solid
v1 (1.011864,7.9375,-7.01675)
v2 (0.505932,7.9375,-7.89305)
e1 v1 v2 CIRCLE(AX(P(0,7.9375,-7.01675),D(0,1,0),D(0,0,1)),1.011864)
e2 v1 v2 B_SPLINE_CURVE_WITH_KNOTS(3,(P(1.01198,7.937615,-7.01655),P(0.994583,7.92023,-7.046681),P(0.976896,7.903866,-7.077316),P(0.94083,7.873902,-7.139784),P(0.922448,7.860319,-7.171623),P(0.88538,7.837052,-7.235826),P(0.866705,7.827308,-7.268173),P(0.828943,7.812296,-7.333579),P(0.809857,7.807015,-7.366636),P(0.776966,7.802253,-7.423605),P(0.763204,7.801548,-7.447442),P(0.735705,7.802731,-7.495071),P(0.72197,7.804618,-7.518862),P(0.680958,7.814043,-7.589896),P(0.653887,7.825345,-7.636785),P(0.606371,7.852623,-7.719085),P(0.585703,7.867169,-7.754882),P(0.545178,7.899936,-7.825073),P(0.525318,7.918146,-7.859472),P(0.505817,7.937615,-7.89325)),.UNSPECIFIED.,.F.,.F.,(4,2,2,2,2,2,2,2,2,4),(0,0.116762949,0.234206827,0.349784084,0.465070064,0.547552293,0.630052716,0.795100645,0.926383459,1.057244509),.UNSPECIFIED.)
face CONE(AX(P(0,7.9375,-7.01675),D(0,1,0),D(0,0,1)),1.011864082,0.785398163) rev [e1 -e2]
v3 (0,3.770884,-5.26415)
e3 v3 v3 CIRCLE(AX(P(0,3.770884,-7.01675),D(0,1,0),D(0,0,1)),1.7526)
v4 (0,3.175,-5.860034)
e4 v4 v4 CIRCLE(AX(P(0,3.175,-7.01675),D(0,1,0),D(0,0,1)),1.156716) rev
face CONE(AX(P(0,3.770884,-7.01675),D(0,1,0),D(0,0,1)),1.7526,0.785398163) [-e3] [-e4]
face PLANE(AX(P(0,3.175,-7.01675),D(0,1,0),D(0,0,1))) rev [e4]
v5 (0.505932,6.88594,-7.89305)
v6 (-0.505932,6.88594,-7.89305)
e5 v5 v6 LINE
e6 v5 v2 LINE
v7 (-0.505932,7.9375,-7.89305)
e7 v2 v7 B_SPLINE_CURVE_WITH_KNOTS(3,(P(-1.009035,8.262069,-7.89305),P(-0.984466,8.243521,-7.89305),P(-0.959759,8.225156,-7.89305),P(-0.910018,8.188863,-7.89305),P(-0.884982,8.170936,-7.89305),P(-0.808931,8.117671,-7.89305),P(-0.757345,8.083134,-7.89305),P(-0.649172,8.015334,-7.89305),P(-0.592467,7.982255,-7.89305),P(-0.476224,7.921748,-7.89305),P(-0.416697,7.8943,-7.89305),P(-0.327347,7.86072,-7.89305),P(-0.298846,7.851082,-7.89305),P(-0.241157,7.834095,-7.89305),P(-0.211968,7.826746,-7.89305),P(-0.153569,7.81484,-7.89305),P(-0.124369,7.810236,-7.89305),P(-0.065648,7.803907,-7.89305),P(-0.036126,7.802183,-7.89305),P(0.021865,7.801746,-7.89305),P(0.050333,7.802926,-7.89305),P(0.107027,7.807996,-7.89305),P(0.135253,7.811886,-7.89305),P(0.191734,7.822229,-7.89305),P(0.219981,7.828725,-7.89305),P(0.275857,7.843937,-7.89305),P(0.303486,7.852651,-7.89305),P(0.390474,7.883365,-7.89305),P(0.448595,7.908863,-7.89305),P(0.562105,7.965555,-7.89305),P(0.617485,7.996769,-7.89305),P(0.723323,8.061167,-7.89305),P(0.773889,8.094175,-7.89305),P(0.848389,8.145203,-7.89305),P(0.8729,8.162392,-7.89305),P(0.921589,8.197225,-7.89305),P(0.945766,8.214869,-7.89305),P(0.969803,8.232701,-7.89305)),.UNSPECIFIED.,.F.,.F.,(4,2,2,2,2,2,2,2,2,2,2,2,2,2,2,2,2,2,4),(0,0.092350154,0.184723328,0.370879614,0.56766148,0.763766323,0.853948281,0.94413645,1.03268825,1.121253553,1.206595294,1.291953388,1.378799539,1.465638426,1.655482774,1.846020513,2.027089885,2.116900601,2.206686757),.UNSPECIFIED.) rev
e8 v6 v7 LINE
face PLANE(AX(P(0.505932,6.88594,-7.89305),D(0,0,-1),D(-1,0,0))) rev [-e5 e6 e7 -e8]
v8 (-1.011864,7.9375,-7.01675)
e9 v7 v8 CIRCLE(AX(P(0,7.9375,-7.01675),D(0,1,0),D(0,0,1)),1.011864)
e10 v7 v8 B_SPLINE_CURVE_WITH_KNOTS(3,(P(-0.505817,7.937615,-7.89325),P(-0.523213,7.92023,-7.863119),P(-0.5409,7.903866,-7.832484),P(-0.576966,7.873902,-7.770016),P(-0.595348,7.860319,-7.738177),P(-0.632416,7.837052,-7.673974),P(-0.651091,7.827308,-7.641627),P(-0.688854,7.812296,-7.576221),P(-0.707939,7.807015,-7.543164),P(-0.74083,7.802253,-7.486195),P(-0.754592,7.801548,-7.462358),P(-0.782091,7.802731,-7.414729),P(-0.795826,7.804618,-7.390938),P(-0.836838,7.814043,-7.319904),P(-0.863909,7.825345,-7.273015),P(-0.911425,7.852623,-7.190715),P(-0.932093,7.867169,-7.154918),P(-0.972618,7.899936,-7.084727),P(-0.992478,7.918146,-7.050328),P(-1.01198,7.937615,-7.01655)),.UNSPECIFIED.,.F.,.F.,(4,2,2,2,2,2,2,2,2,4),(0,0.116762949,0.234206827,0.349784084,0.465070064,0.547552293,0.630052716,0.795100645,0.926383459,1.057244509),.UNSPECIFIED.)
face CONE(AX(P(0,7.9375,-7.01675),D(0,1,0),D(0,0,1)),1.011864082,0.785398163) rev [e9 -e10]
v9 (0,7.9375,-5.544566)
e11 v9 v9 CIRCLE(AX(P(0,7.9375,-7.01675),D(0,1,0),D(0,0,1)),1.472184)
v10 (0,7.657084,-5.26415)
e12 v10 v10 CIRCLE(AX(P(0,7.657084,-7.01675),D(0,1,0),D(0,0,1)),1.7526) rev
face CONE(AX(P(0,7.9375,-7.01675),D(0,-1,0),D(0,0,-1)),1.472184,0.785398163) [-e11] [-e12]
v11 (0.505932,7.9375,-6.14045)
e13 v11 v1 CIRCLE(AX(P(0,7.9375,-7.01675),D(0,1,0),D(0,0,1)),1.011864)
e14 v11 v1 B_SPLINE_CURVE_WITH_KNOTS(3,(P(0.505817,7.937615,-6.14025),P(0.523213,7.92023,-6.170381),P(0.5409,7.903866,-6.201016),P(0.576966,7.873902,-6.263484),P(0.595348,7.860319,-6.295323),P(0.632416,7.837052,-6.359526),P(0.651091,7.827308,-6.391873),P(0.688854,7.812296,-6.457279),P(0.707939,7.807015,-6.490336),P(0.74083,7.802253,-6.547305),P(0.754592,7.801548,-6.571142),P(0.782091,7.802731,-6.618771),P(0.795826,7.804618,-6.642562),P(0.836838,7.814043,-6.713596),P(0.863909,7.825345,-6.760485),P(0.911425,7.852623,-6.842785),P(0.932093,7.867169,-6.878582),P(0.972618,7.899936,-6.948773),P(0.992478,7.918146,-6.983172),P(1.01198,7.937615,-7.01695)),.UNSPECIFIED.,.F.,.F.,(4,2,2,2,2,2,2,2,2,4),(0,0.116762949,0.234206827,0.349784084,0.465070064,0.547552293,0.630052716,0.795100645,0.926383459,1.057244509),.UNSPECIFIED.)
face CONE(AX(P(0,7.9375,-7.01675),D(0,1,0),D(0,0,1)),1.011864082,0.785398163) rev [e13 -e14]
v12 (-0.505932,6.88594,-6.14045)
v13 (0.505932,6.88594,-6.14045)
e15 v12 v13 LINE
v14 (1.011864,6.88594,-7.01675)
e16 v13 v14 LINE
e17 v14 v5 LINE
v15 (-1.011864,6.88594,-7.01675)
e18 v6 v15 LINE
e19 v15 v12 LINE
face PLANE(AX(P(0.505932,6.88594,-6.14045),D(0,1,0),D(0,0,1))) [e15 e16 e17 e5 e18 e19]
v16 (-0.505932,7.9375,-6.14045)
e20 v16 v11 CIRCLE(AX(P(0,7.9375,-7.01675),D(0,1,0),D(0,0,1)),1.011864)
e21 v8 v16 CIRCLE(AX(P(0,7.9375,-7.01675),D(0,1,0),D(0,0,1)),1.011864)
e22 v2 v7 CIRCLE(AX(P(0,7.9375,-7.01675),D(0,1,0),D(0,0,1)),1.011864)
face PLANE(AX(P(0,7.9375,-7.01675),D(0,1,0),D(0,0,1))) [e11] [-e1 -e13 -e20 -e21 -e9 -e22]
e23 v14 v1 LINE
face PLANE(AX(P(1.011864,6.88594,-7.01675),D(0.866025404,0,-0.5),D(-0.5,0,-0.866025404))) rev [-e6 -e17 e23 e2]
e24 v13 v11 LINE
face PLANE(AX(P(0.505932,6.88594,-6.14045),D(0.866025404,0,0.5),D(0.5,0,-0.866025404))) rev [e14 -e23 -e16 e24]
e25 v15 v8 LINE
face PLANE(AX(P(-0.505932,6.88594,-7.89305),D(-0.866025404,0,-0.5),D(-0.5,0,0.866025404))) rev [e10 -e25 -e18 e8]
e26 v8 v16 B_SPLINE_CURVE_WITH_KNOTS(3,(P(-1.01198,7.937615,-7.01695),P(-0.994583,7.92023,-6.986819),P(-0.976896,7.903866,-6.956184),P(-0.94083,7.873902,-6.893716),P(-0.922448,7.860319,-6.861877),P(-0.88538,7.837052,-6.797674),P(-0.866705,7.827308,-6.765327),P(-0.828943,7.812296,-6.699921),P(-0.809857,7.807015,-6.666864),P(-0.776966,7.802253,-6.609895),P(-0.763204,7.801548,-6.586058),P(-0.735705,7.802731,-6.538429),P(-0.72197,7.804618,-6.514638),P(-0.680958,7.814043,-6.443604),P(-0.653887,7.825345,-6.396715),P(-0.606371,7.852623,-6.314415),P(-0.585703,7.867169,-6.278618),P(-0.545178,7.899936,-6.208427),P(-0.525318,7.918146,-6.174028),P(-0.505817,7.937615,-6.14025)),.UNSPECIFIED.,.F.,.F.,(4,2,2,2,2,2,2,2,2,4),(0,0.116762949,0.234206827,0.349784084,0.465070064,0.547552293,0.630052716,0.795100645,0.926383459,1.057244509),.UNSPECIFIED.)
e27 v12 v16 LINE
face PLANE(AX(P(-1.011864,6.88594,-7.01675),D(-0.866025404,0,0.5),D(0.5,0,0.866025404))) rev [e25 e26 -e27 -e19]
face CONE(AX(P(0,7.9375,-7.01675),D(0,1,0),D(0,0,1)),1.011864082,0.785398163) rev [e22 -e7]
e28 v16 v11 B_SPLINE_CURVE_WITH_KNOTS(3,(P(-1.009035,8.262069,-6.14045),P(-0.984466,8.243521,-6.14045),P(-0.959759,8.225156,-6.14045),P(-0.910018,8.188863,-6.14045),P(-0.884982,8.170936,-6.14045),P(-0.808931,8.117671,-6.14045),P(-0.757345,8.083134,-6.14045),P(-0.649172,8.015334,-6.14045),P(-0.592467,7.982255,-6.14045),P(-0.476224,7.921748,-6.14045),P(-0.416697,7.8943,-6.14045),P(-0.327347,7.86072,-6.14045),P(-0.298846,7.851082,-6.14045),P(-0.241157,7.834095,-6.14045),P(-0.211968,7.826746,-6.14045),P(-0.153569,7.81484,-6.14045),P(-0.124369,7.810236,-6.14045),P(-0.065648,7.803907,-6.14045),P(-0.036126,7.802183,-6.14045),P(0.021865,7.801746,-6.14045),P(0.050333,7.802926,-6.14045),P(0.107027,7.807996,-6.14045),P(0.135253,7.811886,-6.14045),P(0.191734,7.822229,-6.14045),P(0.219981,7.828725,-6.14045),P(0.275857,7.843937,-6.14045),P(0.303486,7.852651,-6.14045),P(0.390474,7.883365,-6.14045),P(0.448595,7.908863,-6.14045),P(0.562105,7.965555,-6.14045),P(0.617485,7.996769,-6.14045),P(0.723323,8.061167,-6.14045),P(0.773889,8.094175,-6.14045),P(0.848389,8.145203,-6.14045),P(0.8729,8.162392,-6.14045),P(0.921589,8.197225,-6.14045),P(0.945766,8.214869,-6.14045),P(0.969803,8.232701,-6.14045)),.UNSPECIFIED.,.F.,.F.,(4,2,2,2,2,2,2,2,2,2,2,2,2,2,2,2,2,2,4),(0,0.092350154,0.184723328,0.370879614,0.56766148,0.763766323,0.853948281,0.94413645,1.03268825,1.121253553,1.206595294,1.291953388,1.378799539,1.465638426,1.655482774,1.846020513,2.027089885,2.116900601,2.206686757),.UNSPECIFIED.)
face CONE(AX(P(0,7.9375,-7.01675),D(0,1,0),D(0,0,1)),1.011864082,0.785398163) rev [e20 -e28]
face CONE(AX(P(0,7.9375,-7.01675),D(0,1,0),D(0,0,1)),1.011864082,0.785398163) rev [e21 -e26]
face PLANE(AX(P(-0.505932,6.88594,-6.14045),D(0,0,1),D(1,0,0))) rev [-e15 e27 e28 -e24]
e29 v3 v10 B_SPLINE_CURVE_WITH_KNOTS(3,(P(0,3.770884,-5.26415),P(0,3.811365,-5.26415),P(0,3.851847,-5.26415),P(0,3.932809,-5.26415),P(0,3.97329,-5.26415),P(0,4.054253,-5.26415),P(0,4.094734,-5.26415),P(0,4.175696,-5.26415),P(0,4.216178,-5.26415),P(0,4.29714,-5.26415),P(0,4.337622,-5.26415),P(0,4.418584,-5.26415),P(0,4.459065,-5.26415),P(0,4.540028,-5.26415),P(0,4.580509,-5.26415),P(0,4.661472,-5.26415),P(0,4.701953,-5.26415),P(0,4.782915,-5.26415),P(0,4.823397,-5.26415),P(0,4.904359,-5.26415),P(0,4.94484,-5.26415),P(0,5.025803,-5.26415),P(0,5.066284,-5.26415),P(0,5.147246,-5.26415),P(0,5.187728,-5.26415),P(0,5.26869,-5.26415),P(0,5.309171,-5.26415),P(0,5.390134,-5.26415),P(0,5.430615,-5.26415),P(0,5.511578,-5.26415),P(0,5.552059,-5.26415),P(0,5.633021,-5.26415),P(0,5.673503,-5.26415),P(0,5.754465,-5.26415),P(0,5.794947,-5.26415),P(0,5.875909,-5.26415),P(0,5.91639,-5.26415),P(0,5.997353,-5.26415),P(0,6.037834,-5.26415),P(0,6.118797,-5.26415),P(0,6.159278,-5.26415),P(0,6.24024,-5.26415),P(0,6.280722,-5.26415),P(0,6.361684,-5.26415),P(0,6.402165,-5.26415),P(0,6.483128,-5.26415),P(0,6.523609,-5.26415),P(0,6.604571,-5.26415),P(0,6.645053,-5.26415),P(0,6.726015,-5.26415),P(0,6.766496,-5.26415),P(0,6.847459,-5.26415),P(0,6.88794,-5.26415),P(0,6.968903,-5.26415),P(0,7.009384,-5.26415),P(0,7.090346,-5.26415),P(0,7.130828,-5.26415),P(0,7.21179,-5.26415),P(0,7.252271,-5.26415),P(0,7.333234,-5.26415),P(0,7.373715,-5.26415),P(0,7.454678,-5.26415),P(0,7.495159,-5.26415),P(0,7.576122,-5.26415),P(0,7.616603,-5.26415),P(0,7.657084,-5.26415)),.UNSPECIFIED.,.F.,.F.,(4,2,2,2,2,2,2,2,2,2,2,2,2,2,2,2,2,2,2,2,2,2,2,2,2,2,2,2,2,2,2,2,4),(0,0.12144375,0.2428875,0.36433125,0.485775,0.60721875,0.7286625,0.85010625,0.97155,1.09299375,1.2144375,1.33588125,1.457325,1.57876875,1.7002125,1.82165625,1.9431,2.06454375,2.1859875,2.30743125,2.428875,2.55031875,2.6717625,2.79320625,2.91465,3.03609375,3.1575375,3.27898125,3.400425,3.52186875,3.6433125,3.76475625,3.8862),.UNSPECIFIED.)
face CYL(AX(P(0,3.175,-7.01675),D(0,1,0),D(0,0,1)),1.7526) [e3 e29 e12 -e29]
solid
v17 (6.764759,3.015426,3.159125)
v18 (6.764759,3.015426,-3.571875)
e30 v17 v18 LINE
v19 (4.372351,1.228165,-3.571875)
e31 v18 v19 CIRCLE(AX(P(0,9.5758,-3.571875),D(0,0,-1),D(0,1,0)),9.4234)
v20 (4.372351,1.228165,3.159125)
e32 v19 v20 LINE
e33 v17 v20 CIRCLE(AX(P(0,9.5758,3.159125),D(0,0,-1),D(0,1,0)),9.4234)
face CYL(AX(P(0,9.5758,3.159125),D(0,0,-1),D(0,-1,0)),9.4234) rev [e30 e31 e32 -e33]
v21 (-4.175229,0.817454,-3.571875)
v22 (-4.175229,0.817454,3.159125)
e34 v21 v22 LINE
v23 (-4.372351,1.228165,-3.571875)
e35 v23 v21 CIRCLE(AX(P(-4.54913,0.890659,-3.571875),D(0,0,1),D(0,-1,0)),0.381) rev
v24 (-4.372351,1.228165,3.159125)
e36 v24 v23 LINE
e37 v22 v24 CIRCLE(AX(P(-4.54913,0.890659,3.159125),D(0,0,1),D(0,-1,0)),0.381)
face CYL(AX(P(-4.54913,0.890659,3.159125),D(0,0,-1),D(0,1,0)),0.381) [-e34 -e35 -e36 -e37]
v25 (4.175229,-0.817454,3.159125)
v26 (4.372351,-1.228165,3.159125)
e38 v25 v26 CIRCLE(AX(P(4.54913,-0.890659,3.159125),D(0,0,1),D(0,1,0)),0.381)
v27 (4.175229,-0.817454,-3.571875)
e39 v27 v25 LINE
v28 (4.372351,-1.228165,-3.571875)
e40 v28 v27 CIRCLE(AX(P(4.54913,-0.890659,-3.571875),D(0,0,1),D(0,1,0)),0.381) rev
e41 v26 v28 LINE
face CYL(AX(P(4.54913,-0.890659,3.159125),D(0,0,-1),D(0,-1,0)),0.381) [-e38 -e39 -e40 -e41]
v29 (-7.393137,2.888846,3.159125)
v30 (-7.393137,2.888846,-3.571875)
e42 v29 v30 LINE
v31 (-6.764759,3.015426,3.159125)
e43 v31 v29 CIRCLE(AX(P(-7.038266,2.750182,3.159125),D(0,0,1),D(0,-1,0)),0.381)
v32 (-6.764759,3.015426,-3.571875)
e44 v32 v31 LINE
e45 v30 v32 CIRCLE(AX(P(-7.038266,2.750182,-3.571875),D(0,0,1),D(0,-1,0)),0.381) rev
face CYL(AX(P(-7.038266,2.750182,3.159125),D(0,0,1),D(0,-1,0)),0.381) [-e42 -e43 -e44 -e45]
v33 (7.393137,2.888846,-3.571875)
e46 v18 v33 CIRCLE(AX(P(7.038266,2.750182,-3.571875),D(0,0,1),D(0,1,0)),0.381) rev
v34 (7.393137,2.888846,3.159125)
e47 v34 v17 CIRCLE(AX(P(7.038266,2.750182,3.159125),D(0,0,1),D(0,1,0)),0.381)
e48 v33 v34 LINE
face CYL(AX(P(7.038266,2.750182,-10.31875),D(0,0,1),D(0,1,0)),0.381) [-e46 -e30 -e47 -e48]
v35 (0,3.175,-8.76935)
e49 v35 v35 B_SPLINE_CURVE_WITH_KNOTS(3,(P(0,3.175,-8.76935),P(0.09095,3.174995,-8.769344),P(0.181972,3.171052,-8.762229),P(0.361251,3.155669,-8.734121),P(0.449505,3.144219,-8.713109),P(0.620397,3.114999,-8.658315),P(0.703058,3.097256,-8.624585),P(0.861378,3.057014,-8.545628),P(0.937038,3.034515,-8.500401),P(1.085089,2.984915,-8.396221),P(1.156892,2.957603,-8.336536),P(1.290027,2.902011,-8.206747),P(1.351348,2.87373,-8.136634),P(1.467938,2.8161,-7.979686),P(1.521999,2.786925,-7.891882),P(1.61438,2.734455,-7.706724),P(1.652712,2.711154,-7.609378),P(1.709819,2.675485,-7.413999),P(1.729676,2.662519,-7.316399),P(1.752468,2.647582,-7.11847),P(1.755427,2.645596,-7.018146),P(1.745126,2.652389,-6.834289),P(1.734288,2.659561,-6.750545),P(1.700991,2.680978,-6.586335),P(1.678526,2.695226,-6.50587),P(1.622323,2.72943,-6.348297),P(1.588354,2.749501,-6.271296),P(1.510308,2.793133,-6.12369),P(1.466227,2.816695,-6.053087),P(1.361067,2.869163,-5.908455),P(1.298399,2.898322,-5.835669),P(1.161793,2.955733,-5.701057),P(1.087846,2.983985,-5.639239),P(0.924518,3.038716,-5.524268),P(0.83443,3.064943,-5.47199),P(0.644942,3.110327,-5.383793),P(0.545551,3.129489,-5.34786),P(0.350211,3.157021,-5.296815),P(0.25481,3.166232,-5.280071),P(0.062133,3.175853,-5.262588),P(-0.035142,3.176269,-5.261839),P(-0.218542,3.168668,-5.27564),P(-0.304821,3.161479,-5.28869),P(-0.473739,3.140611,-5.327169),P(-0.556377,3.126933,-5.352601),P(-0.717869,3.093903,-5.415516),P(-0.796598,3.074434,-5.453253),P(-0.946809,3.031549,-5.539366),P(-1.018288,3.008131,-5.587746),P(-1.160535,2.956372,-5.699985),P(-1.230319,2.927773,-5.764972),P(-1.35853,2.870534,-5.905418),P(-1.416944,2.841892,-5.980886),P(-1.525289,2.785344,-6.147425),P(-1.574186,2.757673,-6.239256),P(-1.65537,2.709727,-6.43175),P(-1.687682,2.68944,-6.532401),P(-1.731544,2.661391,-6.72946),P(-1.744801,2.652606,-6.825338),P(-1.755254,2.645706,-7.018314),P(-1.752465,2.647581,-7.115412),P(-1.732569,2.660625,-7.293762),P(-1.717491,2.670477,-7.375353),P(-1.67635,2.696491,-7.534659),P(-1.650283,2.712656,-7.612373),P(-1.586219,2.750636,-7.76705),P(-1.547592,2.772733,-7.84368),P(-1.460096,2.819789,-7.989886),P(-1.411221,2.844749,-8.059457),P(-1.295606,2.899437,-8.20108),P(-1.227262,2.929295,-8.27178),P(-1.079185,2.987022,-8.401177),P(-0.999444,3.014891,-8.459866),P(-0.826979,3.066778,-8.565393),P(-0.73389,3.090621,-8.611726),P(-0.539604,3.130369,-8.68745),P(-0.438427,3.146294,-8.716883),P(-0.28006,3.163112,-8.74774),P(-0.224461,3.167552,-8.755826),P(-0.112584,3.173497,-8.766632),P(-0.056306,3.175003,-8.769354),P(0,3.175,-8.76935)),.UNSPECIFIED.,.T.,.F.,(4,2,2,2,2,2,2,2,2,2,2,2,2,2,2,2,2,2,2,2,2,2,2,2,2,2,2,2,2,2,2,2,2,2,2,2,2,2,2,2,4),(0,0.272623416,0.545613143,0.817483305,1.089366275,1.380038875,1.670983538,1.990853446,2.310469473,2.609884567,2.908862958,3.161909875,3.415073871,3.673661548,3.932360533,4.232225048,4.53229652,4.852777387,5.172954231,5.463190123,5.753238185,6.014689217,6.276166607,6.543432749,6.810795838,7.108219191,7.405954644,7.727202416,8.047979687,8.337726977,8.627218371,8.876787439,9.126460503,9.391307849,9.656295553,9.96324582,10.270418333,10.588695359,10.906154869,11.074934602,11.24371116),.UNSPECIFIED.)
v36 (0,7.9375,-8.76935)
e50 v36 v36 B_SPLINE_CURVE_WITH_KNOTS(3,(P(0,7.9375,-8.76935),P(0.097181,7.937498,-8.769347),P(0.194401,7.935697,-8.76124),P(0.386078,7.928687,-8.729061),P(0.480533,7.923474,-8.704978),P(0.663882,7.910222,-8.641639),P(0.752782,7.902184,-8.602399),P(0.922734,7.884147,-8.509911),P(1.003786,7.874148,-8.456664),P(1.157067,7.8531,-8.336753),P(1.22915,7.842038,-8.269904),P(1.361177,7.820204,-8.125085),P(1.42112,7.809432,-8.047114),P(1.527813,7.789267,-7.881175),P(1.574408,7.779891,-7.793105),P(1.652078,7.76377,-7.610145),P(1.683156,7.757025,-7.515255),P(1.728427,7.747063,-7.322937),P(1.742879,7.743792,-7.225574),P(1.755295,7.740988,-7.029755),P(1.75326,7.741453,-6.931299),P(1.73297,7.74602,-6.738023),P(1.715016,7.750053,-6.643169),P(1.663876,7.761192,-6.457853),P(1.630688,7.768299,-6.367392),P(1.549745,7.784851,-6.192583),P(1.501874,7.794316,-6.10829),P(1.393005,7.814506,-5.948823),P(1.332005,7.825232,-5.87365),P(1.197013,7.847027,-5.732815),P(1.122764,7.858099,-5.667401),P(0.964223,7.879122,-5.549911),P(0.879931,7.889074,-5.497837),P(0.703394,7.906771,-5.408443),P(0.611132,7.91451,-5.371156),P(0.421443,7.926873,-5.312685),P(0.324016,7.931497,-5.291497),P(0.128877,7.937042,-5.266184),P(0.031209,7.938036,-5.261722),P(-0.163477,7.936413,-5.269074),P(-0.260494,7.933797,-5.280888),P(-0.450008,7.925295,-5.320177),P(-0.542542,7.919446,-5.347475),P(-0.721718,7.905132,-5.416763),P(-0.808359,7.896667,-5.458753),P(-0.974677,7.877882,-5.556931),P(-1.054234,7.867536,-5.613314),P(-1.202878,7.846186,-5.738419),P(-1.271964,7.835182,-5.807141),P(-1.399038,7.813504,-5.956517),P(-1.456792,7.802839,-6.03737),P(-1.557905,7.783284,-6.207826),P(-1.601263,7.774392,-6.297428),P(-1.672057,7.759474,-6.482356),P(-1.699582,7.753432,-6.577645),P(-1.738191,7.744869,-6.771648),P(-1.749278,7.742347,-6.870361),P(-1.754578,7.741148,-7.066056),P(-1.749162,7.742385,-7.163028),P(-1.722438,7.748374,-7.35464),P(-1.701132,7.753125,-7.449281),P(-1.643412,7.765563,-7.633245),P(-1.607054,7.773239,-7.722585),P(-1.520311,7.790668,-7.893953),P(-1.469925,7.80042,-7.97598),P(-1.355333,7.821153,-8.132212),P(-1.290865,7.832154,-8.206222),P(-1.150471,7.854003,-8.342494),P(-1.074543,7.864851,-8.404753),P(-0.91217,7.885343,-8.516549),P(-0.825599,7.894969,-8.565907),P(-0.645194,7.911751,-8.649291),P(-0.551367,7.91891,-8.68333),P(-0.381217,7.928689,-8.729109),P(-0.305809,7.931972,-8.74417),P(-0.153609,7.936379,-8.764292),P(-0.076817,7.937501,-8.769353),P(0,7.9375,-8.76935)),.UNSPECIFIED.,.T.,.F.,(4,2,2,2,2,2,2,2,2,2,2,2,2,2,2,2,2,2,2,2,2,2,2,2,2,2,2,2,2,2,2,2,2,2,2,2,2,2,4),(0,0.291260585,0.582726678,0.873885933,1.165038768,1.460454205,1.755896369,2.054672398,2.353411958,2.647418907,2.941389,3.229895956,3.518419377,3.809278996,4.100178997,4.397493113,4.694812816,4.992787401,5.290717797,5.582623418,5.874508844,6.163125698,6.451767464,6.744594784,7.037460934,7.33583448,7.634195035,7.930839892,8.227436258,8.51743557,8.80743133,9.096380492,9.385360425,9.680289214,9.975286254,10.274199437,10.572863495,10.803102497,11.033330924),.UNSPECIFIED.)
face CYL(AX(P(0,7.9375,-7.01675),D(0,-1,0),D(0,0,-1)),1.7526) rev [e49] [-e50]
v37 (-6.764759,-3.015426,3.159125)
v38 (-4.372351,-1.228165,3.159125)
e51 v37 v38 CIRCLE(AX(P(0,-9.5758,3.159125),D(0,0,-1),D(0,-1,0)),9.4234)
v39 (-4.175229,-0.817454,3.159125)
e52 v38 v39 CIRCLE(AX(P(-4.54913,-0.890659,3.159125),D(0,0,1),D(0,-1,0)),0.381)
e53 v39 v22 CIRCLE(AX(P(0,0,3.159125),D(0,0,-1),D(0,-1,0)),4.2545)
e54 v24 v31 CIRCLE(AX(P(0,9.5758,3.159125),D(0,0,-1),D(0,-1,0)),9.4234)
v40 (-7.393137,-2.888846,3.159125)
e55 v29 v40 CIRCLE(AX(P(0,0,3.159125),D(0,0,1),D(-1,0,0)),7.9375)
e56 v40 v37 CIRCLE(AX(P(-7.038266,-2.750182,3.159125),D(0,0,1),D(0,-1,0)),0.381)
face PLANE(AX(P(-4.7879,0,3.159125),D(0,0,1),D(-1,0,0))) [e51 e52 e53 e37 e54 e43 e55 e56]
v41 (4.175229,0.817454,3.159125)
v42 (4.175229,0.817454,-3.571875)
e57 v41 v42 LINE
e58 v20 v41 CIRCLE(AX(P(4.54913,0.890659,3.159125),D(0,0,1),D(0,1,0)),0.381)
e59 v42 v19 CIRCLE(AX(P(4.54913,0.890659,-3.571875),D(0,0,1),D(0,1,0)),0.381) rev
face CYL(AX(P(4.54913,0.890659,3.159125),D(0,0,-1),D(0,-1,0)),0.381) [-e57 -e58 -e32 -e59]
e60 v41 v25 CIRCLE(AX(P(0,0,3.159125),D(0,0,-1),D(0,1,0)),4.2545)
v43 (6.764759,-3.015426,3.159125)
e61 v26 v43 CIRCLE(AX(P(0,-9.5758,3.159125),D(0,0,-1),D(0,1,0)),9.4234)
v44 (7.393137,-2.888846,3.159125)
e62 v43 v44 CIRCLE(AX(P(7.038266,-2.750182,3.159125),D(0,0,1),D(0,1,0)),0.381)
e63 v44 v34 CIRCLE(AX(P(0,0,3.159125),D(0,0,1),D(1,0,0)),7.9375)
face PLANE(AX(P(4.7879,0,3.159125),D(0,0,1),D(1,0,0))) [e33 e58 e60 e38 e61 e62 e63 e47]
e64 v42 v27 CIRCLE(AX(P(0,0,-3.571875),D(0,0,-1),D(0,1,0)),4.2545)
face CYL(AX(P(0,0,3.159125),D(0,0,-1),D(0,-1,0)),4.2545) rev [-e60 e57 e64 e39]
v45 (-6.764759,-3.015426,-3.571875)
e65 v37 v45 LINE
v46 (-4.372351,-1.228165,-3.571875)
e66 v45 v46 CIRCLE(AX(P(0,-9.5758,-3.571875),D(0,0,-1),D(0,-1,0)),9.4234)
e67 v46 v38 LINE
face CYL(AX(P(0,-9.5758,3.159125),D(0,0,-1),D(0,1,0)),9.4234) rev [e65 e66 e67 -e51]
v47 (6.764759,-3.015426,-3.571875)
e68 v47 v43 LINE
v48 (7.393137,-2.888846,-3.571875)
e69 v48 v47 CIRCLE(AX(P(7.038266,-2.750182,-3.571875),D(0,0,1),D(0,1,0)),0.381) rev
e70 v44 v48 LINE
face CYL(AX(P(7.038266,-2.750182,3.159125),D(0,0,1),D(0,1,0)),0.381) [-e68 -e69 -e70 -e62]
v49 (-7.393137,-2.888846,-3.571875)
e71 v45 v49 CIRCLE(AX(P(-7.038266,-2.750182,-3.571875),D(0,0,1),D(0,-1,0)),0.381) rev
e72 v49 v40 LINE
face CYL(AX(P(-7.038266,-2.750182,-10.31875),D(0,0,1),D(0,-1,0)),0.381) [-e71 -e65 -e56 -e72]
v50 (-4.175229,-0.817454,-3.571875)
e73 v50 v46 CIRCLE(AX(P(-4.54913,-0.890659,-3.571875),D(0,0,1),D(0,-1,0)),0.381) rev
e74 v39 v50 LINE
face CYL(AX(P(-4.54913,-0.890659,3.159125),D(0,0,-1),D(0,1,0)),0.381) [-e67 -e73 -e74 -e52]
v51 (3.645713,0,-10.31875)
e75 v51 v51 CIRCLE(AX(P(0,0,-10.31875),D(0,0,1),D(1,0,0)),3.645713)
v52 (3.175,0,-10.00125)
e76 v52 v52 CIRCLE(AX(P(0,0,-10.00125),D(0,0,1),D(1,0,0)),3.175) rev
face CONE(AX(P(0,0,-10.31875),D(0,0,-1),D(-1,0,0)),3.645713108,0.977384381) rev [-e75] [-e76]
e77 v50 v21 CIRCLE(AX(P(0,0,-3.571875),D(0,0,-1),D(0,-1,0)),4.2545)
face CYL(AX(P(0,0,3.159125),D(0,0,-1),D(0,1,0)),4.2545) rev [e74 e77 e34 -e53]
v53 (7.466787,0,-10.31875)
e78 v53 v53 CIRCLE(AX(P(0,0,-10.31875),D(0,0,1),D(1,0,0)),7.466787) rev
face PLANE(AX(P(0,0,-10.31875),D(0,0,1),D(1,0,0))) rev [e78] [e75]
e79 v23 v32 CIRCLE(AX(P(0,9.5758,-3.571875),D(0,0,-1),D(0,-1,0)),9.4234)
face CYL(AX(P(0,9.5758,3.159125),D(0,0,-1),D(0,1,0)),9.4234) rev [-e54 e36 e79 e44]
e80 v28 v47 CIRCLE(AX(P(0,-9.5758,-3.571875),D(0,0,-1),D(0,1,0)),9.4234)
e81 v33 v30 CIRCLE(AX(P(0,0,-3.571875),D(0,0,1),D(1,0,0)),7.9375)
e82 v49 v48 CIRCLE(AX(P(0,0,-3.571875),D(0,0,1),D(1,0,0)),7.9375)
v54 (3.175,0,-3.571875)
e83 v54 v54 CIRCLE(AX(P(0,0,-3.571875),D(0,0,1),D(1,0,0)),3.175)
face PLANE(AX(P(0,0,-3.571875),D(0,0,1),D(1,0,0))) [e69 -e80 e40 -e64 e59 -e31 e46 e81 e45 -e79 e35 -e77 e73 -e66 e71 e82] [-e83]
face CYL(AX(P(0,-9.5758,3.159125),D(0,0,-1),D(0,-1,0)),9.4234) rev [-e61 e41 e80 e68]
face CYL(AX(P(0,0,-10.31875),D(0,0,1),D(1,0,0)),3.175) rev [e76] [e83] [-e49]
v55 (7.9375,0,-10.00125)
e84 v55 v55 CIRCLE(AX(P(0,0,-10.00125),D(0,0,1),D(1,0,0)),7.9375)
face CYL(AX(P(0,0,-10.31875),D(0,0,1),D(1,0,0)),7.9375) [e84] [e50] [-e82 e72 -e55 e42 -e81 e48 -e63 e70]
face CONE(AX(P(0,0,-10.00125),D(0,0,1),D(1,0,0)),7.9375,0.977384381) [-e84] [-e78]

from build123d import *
from OCP.BRepFilletAPI import BRepFilletAPI_MakeChamfer
from build123d.topology import SkipClean

# Parameters (mm, degrees)
BOSS_EXTRUDE1_START     = -3.571875
SKETCH1_R               = 7.9375
BOSS_EXTRUDE1_DEPTH     = 6.746875
BOSS_EXTRUDE4_START     = 6.731
BOSS_EXTRUDE4_DEPTH     = 6.731
FILLET2_R               = 0.381
MOVE_START              = -3.571875
MOVE_FACE3_DEPTH        = 6.731
MOVE_FACE3_2_DEPTH      = 6.731
CIRPATTERN2_START       = -3.571875
CIRPATTERN2_DEPTH       = 6.731
CUT_EXTRUDE5_DEPTH      = 16.24743959
CUT_EXTRUDE5_DEPTH_BACK = 16.24743959
SKETCH15_R              = 3.175
CHAMFER1_SIZE           = 0.3175
CHAMFER1_SIZE2          = 0.470713108
SKETCH5_R               = 1.7526
CUT_EXTRUDE2_DEPTH      = 16.24743959
SKETCH6_R               = 1.7526
BOSS_EXTRUDE3_DEPTH     = 4.7625
CUT_EXTRUDE3_DEPTH      = 1.05156
CHAMFER3_SIZE           = 0.280416
CHAMFER4_SIZE           = 0.595884


# Read off the part's stored shape, not the designer's step: Move Face3, CirPattern2
with BuildPart() as part:
    # Sketch1 → Boss-Extrude1 (new body)
    with BuildSketch(Plane.XY.offset(BOSS_EXTRUDE1_START)):
        Circle(SKETCH1_R)
    extrude(amount=-BOSS_EXTRUDE1_DEPTH)

    # Sketch10 → Boss-Extrude4 (add)
    with BuildSketch(Plane.XY.offset(-3.571875).offset(BOSS_EXTRUDE4_START)):
        with BuildLine():
            ThreePointArc((-1.096318236, -4.110821886), (0, -4.2545), (1.096318236, -4.110821886))
            ThreePointArc((1.096318236, -4.110821886), (2.111997853, -5.752575517), (3.440933621, -7.152893266))
            ThreePointArc((3.440933621, -7.152893266), (0, -7.9375), (-3.440933621, -7.152893266))
            ThreePointArc((-3.440933621, -7.152893266), (-2.111997853, -5.752575517), (-1.096318236, -4.110821886))
        make_face()
    extrude(amount=-BOSS_EXTRUDE4_DEPTH)

    # Fillet2
    fillet2_edges = [part.edges().sort_by_distance(p)[0] for p in [
        (-3.440933621, -7.152893266, -0.206375),
        (3.440933621, -7.152893266, -0.206375),
        (-1.096318236, -4.110821886, -0.206375),
        (1.096318236, -4.110821886, -0.206375),
    ]]
    fillet(fillet2_edges, radius=FILLET2_R)

    # Move Face3 outline → Move Face3 (cut)
    with BuildSketch(Plane.XY.offset(MOVE_START)):
        with BuildLine():
            ThreePointArc((-3.015425868, -6.764758592), (-3.123679186, -7.113503156), (-2.888846251, -7.393136925))
            ThreePointArc((-2.888846251, -7.393136925), (0, -7.9375), (2.888846251, -7.393136925))
            ThreePointArc((2.888846251, -7.393136925), (3.123679186, -7.113503156), (3.015425868, -6.764758592))
            ThreePointArc((3.015425868, -6.764758592), (2.026423119, -5.639802857), (1.228164561, -4.372350642))
            ThreePointArc((1.228164561, -4.372350642), (1.055516359, -4.205643666), (0.817454229, -4.175229195))
            ThreePointArc((0.817454229, -4.175229195), (0, -4.2545), (-0.817454229, -4.175229195))
            ThreePointArc((-0.817454229, -4.175229195), (-1.055516359, -4.205643666), (-1.228164561, -4.372350642))
            ThreePointArc((-1.228164561, -4.372350642), (-2.026423119, -5.639802857), (-3.015425868, -6.764758592))
        make_face()
    extrude(amount=MOVE_FACE3_DEPTH, mode=Mode.SUBTRACT)

    # Move Face3 2 outline → Move Face3 2 (add)
    with SkipClean():  # the faces are left unmerged after this step: merging them gives an invalid solid
        with BuildSketch(Plane.XY.offset(MOVE_START)):
            with BuildLine():
                ThreePointArc((7.393136925, 2.888846251), (7.113503156, 3.123679186), (6.764758592, 3.015425868))
                ThreePointArc((6.764758592, 3.015425868), (5.639802857, 2.026423119), (4.372350642, 1.228164561))
                ThreePointArc((4.372350642, 1.228164561), (4.205643666, 1.055516359), (4.175229195, 0.817454229))
                ThreePointArc((4.175229195, 0.817454229), (4.2545, 0), (4.175229195, -0.817454229))
                ThreePointArc((4.175229195, -0.817454229), (4.205643666, -1.055516359), (4.372350642, -1.228164561))
                ThreePointArc((4.372350642, -1.228164561), (5.639802857, -2.026423119), (6.764758592, -3.015425868))
                ThreePointArc((6.764758592, -3.015425868), (7.113503156, -3.123679186), (7.393136925, -2.888846251))
                ThreePointArc((7.393136925, -2.888846251), (7.9375, 0), (7.393136925, 2.888846251))
            make_face()
        extrude(amount=MOVE_FACE3_2_DEPTH)

    # CirPattern2 outline → CirPattern2 (add)
    with SkipClean():  # the faces are left unmerged after this step: merging them gives an invalid solid
        with BuildSketch(Plane.XY.offset(CIRPATTERN2_START)):
            with BuildLine():
                ThreePointArc((-4.372350642, 1.228164561), (-5.639802857, 2.026423119), (-6.764758592, 3.015425868))
                ThreePointArc((-6.764758592, 3.015425868), (-7.113503156, 3.123679186), (-7.393136925, 2.888846251))
                ThreePointArc((-7.393136925, 2.888846251), (-7.9375, 0), (-7.393136925, -2.888846251))
                ThreePointArc((-7.393136925, -2.888846251), (-7.113503156, -3.123679186), (-6.764758592, -3.015425868))
                ThreePointArc((-6.764758592, -3.015425868), (-5.639802857, -2.026423119), (-4.372350642, -1.228164561))
                ThreePointArc((-4.372350642, -1.228164561), (-4.205643666, -1.055516359), (-4.175229195, -0.817454229))
                ThreePointArc((-4.175229195, -0.817454229), (-4.2545, 0), (-4.175229195, 0.817454229))
                ThreePointArc((-4.175229195, 0.817454229), (-4.205643666, 1.055516359), (-4.372350642, 1.228164561))
            make_face()
        extrude(amount=CIRPATTERN2_DEPTH)

    # Sketch15 → Cut-Extrude5 (cut, two sides: drawn at the far end of the back side and taken through both)
    with SkipClean():  # the faces are left unmerged after this step: merging them gives an invalid solid
        with BuildSketch(Plane.XY.offset(-CUT_EXTRUDE5_DEPTH_BACK)):
            Circle(SKETCH15_R)
        extrude(amount=CUT_EXTRUDE5_DEPTH + CUT_EXTRUDE5_DEPTH_BACK, mode=Mode.SUBTRACT)

    # Chamfer1: one chamfer whose edges measure the first distance from different faces: ONE call of the kernel's chamfer builder (chamfer() names one face for all edges)
    chamfer1_edges_1 = [part.edges().sort_by_distance(p)[0] for p in [
        (-7.9375, 0, -10.31875),
    ]]
    chamfer1_side_1 = [part.faces().sort_by_distance(p)[0] for p in [
        (-7.9375, 0, -6.9453125),
    ]]
    chamfer1_edges_2 = [part.edges().sort_by_distance(p)[0] for p in [
        (-3.175, 0, -10.31875),
    ]]
    chamfer1_side_2 = [part.faces().sort_by_distance(p)[0] for p in [
        (-3.175, 0, -6.9453125),
    ]]
    chamfer1 = BRepFilletAPI_MakeChamfer(part.part.solid().wrapped)
    for e in chamfer1_edges_1:
        chamfer1.Add(CHAMFER1_SIZE, CHAMFER1_SIZE2, e.wrapped, chamfer1_side_1[0].wrapped)  # the first distance lies on this face
    for e in chamfer1_edges_2:
        chamfer1.Add(CHAMFER1_SIZE, CHAMFER1_SIZE2, e.wrapped, chamfer1_side_2[0].wrapped)  # the first distance lies on this face
    add(Compound.cast(chamfer1.Shape()), mode=Mode.REPLACE)

    # Sketch5 → Cut-Extrude2 (cut, through all)
    with SkipClean():  # the faces are left unmerged after this step: merging them gives an invalid solid
        with BuildSketch(Plane(origin=(0, 0, 0), x_dir=(1, 0, 0), z_dir=(0, 1, 0))):
            with Locations(Location((0, 7.01675, 0), (0, 0, 90))):
                Circle(SKETCH5_R)
        extrude(amount=CUT_EXTRUDE2_DEPTH, mode=Mode.SUBTRACT)


with BuildPart() as body_2:
    # Sketch6 → Boss-Extrude3 (new body)
    with BuildSketch(Plane(origin=(0, 7.9375, 0), x_dir=(-1, 0, 0), z_dir=(0, 1, 0))):
        with Locations(Location((0, -7.01675, 0), (0, 0, 90))):
            Circle(SKETCH6_R)
    extrude(amount=-BOSS_EXTRUDE3_DEPTH)

    # Sketch8 → Cut-Extrude3 (cut)
    with BuildSketch(Plane(origin=(0, 7.9375, 0), x_dir=(1, 0, 0), z_dir=(0, 1, 0))):
        Polygon((0.505932041, 6.14045), (1.011864082, 7.01675), (0.505932041, 7.89305), (-0.505932041, 7.89305), (-1.011864082, 7.01675), (-0.505932041, 6.14045), align=None)
    extrude(amount=-CUT_EXTRUDE3_DEPTH, mode=Mode.SUBTRACT)

    # Cut-Extrude4 cone 1 section (through the dimple's axis) → Cut-Extrude4 (revolve, cut)
    with BuildSketch(Plane(origin=(0, 7.9375, -7.01675), x_dir=(0, 0, 1), z_dir=(1, 0, 0))):
        Polygon((0, 0), (1.011864082, 0), (0, 1.011864082), align=None)
    revolve(axis=Axis((0, 7.9375, -7.01675), (0, -1, 0)), mode=Mode.SUBTRACT)

    # Chamfer3
    chamfer3_edges = [body_2.edges().sort_by_distance(p)[0] for p in [
        (0, 7.9375, -8.76935),
    ]]
    chamfer(chamfer3_edges, length=CHAMFER3_SIZE)

    # Chamfer4
    chamfer4_edges = [body_2.edges().sort_by_distance(p)[0] for p in [
        (0, 3.175, -8.76935),
    ]]
    chamfer(chamfer4_edges, length=CHAMFER4_SIZE)


solid = Compound([part.part, body_2.part])
